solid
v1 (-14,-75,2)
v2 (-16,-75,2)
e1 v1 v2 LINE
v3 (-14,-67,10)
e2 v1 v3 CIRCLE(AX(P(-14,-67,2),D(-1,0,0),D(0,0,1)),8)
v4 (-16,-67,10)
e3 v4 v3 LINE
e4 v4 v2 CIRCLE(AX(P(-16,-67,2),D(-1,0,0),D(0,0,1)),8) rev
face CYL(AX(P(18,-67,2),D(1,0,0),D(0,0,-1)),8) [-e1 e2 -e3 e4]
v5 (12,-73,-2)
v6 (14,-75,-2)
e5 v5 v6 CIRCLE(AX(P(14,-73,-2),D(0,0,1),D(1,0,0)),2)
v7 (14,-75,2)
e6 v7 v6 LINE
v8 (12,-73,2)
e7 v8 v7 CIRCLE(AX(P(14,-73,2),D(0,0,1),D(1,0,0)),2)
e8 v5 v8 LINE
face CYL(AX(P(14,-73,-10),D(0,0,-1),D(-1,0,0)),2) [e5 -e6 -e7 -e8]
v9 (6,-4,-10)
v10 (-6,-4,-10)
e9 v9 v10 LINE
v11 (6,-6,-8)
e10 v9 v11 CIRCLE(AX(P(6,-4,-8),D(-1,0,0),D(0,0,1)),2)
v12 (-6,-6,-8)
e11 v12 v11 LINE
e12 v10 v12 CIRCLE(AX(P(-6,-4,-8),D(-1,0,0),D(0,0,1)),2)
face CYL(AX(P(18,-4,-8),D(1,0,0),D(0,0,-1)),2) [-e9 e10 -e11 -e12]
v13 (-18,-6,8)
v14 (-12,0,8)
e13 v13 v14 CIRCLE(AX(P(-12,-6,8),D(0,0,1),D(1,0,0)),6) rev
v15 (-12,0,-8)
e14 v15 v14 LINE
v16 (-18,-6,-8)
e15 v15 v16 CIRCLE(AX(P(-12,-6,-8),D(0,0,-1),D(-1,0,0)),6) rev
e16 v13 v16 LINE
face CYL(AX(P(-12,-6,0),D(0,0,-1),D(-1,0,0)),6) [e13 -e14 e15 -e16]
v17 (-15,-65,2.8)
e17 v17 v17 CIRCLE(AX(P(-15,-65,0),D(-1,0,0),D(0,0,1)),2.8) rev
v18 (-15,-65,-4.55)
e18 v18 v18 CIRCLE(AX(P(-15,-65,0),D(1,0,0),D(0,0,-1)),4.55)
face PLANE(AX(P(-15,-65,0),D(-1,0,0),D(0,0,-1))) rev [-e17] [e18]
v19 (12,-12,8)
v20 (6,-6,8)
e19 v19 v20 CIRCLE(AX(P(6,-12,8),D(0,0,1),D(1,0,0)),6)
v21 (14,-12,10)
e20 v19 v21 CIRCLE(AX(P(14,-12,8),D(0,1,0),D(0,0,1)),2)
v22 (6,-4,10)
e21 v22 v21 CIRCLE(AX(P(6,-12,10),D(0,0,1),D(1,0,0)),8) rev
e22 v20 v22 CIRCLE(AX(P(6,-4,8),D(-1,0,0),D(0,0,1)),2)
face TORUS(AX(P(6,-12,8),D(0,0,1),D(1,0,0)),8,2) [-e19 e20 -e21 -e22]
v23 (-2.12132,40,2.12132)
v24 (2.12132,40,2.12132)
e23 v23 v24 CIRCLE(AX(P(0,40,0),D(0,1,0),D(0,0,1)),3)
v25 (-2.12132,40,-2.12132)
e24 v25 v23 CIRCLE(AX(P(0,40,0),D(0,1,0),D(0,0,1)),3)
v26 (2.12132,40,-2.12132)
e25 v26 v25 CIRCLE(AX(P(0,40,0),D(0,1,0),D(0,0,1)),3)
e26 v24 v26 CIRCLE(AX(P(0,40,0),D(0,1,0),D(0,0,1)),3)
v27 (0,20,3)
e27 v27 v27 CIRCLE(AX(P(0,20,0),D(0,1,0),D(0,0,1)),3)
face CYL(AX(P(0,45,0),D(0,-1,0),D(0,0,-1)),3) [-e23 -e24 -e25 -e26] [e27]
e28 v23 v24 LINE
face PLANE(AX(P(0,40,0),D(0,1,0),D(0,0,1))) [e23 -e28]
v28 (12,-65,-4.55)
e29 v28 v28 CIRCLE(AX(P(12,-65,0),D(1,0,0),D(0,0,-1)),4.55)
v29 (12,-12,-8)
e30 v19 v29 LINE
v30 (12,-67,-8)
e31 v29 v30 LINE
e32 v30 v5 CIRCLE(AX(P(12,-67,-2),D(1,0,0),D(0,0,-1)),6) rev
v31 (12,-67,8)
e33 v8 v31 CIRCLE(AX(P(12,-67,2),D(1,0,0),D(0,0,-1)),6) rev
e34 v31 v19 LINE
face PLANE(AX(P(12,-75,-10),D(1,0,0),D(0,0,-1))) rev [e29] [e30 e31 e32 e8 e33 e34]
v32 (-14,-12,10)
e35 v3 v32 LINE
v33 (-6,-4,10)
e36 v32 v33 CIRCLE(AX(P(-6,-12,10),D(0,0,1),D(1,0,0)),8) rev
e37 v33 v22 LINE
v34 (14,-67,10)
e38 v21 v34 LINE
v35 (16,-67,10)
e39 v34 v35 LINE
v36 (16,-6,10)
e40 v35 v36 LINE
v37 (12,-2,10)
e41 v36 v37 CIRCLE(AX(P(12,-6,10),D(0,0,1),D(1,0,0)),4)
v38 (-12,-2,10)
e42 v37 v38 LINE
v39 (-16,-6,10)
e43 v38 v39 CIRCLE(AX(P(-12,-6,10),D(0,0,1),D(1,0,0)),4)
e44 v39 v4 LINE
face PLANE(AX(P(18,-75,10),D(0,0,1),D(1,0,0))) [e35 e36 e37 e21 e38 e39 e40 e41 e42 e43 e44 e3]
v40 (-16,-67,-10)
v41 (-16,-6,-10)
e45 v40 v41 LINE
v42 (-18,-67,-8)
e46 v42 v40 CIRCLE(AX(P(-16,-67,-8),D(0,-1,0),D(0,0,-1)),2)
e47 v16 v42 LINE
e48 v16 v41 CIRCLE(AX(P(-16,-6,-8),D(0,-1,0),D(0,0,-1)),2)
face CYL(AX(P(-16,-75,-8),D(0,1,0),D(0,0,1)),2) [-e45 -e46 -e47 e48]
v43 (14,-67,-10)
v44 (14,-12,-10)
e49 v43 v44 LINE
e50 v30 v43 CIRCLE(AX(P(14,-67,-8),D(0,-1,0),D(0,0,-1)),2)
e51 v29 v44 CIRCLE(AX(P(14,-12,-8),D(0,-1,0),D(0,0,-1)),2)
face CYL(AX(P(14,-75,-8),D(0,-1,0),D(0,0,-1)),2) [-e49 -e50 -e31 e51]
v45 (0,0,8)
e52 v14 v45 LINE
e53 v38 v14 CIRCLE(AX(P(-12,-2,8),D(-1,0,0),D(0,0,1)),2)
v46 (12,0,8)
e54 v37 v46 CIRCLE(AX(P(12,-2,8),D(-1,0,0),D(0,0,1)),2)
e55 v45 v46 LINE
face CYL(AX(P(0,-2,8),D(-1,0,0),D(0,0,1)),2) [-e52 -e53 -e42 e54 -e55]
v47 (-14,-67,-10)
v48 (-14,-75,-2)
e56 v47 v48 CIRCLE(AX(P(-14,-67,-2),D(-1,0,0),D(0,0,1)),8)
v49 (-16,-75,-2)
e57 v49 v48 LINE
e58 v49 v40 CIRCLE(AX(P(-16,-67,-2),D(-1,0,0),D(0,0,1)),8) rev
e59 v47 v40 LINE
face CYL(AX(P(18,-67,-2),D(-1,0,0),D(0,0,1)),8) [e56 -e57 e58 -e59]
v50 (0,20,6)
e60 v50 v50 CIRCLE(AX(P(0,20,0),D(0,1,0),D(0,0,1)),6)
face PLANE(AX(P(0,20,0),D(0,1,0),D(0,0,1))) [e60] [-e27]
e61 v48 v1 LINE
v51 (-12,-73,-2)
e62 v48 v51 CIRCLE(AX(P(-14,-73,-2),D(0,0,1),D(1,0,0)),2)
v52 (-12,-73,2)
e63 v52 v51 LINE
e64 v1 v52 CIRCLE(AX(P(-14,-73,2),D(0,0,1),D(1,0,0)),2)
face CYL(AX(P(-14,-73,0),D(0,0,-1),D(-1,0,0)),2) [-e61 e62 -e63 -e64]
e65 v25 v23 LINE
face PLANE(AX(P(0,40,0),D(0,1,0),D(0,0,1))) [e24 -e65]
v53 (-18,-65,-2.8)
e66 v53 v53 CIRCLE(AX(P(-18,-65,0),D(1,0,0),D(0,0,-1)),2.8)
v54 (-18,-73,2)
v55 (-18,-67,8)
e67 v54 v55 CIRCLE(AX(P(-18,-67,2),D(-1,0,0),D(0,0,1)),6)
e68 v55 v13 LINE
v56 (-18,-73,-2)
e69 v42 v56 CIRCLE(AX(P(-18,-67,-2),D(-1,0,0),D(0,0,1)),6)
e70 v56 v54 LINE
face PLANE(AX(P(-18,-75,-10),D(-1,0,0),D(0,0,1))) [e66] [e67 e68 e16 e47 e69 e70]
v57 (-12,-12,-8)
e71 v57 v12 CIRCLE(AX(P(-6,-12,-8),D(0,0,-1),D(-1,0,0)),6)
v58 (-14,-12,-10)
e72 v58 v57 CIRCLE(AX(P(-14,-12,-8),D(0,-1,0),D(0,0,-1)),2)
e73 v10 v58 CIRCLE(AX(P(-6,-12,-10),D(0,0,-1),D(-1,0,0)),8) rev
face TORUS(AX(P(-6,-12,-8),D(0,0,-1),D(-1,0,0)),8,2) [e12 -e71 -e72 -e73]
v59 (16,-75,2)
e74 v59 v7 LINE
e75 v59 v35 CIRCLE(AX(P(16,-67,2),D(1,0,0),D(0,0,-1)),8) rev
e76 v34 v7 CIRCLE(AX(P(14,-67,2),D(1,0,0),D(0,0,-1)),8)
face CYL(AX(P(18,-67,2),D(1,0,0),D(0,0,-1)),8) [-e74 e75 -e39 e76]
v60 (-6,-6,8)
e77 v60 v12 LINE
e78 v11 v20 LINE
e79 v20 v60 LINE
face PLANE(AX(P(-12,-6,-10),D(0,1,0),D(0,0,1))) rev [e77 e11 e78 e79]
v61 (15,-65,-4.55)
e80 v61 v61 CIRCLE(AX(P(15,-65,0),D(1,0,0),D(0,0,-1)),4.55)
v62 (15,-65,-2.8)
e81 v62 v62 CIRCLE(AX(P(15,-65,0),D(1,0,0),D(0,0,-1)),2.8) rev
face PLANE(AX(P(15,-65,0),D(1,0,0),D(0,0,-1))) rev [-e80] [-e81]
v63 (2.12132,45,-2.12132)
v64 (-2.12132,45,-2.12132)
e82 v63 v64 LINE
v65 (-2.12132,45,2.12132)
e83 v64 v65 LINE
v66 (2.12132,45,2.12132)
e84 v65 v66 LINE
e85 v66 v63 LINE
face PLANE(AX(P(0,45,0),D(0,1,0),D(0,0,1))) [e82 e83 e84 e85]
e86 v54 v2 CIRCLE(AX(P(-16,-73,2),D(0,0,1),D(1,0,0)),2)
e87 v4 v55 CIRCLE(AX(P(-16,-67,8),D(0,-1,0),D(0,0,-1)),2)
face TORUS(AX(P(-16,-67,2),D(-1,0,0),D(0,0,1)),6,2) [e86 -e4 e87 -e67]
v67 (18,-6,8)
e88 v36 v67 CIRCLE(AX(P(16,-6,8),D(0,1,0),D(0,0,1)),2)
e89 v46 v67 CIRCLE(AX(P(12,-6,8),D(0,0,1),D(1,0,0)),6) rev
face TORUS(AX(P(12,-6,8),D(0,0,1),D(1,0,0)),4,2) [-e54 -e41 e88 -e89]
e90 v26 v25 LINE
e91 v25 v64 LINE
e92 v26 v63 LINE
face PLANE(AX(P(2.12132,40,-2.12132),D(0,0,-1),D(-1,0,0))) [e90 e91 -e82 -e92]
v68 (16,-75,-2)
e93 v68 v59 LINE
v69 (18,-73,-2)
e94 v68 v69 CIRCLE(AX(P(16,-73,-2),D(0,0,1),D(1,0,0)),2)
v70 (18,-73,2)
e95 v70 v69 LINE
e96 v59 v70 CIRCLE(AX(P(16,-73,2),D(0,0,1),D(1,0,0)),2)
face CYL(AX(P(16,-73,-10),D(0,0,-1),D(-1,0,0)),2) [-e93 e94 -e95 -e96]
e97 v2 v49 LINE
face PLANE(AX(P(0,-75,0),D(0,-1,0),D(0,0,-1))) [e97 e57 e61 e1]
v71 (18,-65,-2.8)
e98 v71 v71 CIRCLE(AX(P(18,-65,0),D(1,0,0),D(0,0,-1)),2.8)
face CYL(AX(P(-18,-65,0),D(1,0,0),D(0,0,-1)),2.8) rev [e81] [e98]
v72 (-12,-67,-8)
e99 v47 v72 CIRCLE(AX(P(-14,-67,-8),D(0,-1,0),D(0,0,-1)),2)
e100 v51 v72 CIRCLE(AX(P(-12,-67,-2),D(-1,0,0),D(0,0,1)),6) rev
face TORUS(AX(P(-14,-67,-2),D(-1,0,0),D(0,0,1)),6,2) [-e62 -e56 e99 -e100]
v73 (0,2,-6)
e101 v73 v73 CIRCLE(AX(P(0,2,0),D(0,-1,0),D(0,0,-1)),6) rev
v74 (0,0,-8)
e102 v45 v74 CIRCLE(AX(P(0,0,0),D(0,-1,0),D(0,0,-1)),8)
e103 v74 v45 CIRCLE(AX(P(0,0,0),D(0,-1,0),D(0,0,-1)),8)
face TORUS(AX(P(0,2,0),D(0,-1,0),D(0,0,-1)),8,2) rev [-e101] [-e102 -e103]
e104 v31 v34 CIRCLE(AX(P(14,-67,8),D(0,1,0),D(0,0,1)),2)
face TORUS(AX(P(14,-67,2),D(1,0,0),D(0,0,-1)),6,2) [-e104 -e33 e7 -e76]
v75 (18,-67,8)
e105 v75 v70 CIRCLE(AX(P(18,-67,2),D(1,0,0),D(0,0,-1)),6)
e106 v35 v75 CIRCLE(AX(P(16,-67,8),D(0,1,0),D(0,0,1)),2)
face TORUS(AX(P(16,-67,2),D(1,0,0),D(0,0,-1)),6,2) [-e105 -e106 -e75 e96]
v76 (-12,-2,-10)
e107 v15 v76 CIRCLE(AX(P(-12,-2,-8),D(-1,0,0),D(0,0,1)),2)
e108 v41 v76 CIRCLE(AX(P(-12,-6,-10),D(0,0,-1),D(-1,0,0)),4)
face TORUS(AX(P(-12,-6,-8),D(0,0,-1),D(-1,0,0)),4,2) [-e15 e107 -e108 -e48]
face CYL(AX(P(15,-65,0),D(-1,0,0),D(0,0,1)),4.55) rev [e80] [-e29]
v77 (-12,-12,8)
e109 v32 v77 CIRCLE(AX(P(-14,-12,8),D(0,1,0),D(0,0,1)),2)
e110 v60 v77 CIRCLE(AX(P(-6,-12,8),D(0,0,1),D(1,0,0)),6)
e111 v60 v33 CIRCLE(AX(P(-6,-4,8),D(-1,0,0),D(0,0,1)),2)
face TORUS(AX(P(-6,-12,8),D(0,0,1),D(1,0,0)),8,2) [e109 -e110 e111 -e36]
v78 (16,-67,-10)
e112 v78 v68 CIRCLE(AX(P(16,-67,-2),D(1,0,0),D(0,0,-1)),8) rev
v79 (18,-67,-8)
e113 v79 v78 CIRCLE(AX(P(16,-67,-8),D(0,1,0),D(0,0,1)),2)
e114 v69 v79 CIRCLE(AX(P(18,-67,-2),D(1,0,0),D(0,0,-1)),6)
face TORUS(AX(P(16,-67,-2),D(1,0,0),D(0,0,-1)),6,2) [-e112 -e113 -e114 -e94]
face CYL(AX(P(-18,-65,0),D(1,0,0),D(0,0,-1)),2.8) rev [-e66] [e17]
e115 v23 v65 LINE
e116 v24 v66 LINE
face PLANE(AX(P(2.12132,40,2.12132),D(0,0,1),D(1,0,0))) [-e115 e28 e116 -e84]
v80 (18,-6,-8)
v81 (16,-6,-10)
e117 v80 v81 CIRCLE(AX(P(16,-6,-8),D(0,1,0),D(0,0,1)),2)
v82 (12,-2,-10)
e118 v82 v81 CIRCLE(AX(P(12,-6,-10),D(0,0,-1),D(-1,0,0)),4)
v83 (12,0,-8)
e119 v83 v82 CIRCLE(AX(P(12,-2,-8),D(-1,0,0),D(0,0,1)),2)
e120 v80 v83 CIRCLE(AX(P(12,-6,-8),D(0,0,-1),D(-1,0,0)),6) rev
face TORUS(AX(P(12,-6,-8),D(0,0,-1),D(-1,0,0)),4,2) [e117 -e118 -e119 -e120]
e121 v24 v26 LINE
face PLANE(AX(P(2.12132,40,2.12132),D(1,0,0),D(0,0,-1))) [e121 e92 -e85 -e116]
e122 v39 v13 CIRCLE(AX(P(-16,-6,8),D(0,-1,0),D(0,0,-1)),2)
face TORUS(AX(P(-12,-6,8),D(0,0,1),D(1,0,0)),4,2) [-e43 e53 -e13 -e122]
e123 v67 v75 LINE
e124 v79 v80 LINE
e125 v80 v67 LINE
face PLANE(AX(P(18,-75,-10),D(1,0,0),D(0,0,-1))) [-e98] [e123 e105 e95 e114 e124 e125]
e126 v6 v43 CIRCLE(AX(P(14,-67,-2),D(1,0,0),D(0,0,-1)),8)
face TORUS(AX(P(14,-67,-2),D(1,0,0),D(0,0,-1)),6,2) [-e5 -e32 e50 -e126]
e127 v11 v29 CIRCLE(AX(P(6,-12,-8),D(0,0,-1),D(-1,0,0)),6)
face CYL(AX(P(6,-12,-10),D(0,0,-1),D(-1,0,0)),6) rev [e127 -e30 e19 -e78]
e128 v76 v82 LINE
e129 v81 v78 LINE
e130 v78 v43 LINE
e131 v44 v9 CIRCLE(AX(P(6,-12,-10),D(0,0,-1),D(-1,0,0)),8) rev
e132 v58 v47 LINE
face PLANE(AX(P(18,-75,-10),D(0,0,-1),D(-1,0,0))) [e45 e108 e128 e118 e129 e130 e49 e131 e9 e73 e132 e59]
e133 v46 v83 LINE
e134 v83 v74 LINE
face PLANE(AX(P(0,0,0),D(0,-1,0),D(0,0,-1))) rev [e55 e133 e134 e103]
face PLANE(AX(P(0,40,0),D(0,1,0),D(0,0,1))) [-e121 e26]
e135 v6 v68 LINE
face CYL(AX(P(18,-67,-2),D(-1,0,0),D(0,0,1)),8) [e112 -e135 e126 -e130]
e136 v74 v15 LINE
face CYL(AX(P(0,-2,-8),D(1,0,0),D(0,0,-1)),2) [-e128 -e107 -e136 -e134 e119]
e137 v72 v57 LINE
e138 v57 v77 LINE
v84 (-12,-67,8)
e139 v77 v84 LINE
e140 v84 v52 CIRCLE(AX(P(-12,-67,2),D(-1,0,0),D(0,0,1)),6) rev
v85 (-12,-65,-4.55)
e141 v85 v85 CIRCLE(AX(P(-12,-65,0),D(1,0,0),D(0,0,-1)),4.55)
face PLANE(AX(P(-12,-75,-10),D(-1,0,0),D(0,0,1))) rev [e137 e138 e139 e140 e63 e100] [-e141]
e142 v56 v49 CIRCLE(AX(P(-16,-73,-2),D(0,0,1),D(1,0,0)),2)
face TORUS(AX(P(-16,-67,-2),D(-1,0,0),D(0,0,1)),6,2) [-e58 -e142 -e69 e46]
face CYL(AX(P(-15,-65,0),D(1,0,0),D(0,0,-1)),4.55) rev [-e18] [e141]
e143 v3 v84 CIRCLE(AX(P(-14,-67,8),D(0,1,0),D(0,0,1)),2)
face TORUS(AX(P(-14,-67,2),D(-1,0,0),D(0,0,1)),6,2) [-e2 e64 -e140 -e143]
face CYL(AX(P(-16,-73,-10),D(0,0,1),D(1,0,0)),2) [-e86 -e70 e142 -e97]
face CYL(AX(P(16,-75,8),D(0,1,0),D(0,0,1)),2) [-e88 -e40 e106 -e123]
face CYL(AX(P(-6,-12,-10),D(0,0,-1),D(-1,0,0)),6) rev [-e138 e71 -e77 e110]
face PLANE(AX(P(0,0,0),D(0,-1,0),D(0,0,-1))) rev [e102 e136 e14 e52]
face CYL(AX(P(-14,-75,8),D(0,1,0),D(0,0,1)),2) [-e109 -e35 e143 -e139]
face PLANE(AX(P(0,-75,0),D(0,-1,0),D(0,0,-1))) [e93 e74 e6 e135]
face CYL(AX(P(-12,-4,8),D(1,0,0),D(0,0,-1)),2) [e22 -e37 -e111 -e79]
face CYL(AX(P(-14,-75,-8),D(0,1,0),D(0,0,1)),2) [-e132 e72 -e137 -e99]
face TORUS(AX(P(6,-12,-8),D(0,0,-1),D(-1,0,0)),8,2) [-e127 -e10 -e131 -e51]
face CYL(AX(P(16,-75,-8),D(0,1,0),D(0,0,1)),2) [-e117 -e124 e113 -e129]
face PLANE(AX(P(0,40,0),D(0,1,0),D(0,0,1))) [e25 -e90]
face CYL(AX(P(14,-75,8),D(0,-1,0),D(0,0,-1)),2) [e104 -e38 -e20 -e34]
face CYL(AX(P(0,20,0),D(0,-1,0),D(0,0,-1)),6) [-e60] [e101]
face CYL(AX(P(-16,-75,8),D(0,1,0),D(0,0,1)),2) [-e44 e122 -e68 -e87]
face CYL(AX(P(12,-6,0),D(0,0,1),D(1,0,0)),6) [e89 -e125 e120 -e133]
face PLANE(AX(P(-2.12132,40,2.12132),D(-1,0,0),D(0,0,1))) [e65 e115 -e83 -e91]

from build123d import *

# Parameters (mm, degrees)
SKETCH_1_W           = 36
SKETCH_1_H           = 20
EXTRUDE_1_DEPTH      = 75
SKETCH_2_R           = 6
EXTRUDE_2_DEPTH      = 20
SKETCH_7_R           = 3
EXTRUDE_3_DEPTH      = 25
SKETCH_8_OUTSIDE_W   = 63.374
SKETCH_8_OUTSIDE_H   = 47.374
SKETCH_8_OUTSIDE_W_2 = 4.242640688
SKETCH_8_OUTSIDE_H_2 = 4.242640688
CUT_EXTRUDE_6_DEPTH  = 5
SKETCH_3_W           = 24
SKETCH_3_H           = 69
CUT_EXTRUDE_1_DEPTH  = 80.680612447
FILLET_1_R           = 6
FILLET_4_R           = 2
FILLET_3_R           = 8
FILLET_2_R           = 2
SKETCH_4_R           = 2.8
CUT_EXTRUDE_2_DEPTH  = 84.791407674
SKETCH_6_R           = 4.55
CUT_EXTRUDE_4_DEPTH  = 3


with BuildPart() as part:
    # 草图1 → 凸台-拉伸1 (new body)
    with BuildSketch(Plane(origin=(0, 0, 0), x_dir=(1, 0, 0), z_dir=(0, 1, 0))):
        Rectangle(SKETCH_1_W, SKETCH_1_H)
    extrude(amount=-EXTRUDE_1_DEPTH)

    # 草图2 → 凸台-拉伸2 (add)
    with BuildSketch(Plane(origin=(0, 0, 0), x_dir=(1, 0, 0), z_dir=(0, 1, 0))):
        with Locations(Location((0, 0, 0), (0, 0, 270))):
            Circle(SKETCH_2_R)
    extrude(amount=EXTRUDE_2_DEPTH)

    # 草图7 → 凸台-拉伸3 (add)
    with BuildSketch(Plane(origin=(0, 20, 0), x_dir=(1, 0, 0), z_dir=(0, 1, 0))):
        with Locations(Location((0, 0, 0), (0, 0, 270))):
            Circle(SKETCH_7_R)
    extrude(amount=EXTRUDE_3_DEPTH)

    # 草图8 outside → 切除-拉伸6 (cut)
    with BuildSketch(Plane(origin=(0, 45, 0), x_dir=(1, 0, 0), z_dir=(0, 1, 0))):
        Rectangle(SKETCH_8_OUTSIDE_W, SKETCH_8_OUTSIDE_H)
        Rectangle(SKETCH_8_OUTSIDE_W_2, SKETCH_8_OUTSIDE_H_2, mode=Mode.SUBTRACT)
    extrude(amount=-CUT_EXTRUDE_6_DEPTH, mode=Mode.SUBTRACT)

    # 草图3 → 切除-拉伸1 (cut, through all)
    with BuildSketch(Plane.XY.offset(10)):
        with Locations((0, -40.5)):
            Rectangle(SKETCH_3_W, SKETCH_3_H)
    extrude(amount=-CUT_EXTRUDE_1_DEPTH, mode=Mode.SUBTRACT)

    # 圆角1
    fillet_1_edges = [part.edges().sort_by_distance(p)[0] for p in [
        (18, 0, 0),
        (-18, 0, 0),
        (-12, -6, 0),
        (12, -6, 0),
    ]]
    fillet(fillet_1_edges, radius=FILLET_1_R)

    # 圆角4
    fillet_4_edges = [part.edges().sort_by_distance(p)[0] for p in [
        (0, 0, -6),
    ]]
    fillet(fillet_4_edges, radius=FILLET_4_R)

    # 圆角3
    fillet_3_edges = [part.edges().sort_by_distance(p)[0] for p in [
        (15, -75, -10),
        (-15, -75, -10),
        (15, -75, 10),
        (-15, -75, 10),
    ]]
    fillet(fillet_3_edges, radius=FILLET_3_R)

    # 圆角2
    fillet_2_edges = [part.edges().sort_by_distance(p)[0] for p in [
        (12, -72.656854249, 7.656854249),
        (12, -72.656854249, -7.656854249),
        (18, -75, 0),
        (18, -36.5, 10),
        (18, -72.656854249, 7.656854249),
        (18, -72.656854249, -7.656854249),
        (-18, -36.5, 10),
        (-18, -75, 0),
        (-18, -72.656854249, 7.656854249),
        (-18, -72.656854249, -7.656854249),
        (-12, -75, 0),
        (-12, -72.656854249, 7.656854249),
        (-12, -72.656854249, -7.656854249),
        (0, 0, 10),
        (0, 0, -10),
        (-12, -39.5, 10),
        (0, -6, 10),
        (16.242640687, -1.757359313, 10),
        (-16.242640687, -1.757359313, 10),
        (-12, -39.5, -10),
        (0, -6, -10),
        (16.242640687, -1.757359313, -10),
        (-16.242640687, -1.757359313, -10),
        (10.242640687, -7.757359313, 10),
        (10.242640687, -7.757359313, -10),
        (-10.242640687, -7.757359313, 10),
        (-10.242640687, -7.757359313, -10),
        (-18, -36.5, -10),
        (18, -36.5, -10),
        (12, -39.5, -10),
        (12, -39.5, 10),
        (12, -75, 0),
    ]]
    fillet(fillet_2_edges, radius=FILLET_2_R - 0.0001)  # a hair under: the kernel refuses the full size

    # 草图4 → 切除-拉伸2 (cut, through all)
    with BuildSketch(Plane(origin=(18, 0, 0), x_dir=(0, 0, -1), z_dir=(1, 0, 0))):
        with Locations((0, -65)):
            Circle(SKETCH_4_R)
    extrude(amount=-CUT_EXTRUDE_2_DEPTH, mode=Mode.SUBTRACT)

    # 草图6 → 切除-拉伸4 (cut)
    with BuildSketch(Plane(origin=(12, 0, 0), x_dir=(0, 0, -1), z_dir=(1, 0, 0))):
        with Locations((0, -65)):
            Circle(SKETCH_6_R)
    cut_extrude_4 = extrude(amount=CUT_EXTRUDE_4_DEPTH, mode=Mode.SUBTRACT)

    # 镜向1: 切除-拉伸4 across plane
    add(cut_extrude_4.mirror(Plane(origin=(0, 0, 0), x_dir=(0, 0, 1), z_dir=(1, 0, 0))), mode=Mode.SUBTRACT)


solid = part.part
